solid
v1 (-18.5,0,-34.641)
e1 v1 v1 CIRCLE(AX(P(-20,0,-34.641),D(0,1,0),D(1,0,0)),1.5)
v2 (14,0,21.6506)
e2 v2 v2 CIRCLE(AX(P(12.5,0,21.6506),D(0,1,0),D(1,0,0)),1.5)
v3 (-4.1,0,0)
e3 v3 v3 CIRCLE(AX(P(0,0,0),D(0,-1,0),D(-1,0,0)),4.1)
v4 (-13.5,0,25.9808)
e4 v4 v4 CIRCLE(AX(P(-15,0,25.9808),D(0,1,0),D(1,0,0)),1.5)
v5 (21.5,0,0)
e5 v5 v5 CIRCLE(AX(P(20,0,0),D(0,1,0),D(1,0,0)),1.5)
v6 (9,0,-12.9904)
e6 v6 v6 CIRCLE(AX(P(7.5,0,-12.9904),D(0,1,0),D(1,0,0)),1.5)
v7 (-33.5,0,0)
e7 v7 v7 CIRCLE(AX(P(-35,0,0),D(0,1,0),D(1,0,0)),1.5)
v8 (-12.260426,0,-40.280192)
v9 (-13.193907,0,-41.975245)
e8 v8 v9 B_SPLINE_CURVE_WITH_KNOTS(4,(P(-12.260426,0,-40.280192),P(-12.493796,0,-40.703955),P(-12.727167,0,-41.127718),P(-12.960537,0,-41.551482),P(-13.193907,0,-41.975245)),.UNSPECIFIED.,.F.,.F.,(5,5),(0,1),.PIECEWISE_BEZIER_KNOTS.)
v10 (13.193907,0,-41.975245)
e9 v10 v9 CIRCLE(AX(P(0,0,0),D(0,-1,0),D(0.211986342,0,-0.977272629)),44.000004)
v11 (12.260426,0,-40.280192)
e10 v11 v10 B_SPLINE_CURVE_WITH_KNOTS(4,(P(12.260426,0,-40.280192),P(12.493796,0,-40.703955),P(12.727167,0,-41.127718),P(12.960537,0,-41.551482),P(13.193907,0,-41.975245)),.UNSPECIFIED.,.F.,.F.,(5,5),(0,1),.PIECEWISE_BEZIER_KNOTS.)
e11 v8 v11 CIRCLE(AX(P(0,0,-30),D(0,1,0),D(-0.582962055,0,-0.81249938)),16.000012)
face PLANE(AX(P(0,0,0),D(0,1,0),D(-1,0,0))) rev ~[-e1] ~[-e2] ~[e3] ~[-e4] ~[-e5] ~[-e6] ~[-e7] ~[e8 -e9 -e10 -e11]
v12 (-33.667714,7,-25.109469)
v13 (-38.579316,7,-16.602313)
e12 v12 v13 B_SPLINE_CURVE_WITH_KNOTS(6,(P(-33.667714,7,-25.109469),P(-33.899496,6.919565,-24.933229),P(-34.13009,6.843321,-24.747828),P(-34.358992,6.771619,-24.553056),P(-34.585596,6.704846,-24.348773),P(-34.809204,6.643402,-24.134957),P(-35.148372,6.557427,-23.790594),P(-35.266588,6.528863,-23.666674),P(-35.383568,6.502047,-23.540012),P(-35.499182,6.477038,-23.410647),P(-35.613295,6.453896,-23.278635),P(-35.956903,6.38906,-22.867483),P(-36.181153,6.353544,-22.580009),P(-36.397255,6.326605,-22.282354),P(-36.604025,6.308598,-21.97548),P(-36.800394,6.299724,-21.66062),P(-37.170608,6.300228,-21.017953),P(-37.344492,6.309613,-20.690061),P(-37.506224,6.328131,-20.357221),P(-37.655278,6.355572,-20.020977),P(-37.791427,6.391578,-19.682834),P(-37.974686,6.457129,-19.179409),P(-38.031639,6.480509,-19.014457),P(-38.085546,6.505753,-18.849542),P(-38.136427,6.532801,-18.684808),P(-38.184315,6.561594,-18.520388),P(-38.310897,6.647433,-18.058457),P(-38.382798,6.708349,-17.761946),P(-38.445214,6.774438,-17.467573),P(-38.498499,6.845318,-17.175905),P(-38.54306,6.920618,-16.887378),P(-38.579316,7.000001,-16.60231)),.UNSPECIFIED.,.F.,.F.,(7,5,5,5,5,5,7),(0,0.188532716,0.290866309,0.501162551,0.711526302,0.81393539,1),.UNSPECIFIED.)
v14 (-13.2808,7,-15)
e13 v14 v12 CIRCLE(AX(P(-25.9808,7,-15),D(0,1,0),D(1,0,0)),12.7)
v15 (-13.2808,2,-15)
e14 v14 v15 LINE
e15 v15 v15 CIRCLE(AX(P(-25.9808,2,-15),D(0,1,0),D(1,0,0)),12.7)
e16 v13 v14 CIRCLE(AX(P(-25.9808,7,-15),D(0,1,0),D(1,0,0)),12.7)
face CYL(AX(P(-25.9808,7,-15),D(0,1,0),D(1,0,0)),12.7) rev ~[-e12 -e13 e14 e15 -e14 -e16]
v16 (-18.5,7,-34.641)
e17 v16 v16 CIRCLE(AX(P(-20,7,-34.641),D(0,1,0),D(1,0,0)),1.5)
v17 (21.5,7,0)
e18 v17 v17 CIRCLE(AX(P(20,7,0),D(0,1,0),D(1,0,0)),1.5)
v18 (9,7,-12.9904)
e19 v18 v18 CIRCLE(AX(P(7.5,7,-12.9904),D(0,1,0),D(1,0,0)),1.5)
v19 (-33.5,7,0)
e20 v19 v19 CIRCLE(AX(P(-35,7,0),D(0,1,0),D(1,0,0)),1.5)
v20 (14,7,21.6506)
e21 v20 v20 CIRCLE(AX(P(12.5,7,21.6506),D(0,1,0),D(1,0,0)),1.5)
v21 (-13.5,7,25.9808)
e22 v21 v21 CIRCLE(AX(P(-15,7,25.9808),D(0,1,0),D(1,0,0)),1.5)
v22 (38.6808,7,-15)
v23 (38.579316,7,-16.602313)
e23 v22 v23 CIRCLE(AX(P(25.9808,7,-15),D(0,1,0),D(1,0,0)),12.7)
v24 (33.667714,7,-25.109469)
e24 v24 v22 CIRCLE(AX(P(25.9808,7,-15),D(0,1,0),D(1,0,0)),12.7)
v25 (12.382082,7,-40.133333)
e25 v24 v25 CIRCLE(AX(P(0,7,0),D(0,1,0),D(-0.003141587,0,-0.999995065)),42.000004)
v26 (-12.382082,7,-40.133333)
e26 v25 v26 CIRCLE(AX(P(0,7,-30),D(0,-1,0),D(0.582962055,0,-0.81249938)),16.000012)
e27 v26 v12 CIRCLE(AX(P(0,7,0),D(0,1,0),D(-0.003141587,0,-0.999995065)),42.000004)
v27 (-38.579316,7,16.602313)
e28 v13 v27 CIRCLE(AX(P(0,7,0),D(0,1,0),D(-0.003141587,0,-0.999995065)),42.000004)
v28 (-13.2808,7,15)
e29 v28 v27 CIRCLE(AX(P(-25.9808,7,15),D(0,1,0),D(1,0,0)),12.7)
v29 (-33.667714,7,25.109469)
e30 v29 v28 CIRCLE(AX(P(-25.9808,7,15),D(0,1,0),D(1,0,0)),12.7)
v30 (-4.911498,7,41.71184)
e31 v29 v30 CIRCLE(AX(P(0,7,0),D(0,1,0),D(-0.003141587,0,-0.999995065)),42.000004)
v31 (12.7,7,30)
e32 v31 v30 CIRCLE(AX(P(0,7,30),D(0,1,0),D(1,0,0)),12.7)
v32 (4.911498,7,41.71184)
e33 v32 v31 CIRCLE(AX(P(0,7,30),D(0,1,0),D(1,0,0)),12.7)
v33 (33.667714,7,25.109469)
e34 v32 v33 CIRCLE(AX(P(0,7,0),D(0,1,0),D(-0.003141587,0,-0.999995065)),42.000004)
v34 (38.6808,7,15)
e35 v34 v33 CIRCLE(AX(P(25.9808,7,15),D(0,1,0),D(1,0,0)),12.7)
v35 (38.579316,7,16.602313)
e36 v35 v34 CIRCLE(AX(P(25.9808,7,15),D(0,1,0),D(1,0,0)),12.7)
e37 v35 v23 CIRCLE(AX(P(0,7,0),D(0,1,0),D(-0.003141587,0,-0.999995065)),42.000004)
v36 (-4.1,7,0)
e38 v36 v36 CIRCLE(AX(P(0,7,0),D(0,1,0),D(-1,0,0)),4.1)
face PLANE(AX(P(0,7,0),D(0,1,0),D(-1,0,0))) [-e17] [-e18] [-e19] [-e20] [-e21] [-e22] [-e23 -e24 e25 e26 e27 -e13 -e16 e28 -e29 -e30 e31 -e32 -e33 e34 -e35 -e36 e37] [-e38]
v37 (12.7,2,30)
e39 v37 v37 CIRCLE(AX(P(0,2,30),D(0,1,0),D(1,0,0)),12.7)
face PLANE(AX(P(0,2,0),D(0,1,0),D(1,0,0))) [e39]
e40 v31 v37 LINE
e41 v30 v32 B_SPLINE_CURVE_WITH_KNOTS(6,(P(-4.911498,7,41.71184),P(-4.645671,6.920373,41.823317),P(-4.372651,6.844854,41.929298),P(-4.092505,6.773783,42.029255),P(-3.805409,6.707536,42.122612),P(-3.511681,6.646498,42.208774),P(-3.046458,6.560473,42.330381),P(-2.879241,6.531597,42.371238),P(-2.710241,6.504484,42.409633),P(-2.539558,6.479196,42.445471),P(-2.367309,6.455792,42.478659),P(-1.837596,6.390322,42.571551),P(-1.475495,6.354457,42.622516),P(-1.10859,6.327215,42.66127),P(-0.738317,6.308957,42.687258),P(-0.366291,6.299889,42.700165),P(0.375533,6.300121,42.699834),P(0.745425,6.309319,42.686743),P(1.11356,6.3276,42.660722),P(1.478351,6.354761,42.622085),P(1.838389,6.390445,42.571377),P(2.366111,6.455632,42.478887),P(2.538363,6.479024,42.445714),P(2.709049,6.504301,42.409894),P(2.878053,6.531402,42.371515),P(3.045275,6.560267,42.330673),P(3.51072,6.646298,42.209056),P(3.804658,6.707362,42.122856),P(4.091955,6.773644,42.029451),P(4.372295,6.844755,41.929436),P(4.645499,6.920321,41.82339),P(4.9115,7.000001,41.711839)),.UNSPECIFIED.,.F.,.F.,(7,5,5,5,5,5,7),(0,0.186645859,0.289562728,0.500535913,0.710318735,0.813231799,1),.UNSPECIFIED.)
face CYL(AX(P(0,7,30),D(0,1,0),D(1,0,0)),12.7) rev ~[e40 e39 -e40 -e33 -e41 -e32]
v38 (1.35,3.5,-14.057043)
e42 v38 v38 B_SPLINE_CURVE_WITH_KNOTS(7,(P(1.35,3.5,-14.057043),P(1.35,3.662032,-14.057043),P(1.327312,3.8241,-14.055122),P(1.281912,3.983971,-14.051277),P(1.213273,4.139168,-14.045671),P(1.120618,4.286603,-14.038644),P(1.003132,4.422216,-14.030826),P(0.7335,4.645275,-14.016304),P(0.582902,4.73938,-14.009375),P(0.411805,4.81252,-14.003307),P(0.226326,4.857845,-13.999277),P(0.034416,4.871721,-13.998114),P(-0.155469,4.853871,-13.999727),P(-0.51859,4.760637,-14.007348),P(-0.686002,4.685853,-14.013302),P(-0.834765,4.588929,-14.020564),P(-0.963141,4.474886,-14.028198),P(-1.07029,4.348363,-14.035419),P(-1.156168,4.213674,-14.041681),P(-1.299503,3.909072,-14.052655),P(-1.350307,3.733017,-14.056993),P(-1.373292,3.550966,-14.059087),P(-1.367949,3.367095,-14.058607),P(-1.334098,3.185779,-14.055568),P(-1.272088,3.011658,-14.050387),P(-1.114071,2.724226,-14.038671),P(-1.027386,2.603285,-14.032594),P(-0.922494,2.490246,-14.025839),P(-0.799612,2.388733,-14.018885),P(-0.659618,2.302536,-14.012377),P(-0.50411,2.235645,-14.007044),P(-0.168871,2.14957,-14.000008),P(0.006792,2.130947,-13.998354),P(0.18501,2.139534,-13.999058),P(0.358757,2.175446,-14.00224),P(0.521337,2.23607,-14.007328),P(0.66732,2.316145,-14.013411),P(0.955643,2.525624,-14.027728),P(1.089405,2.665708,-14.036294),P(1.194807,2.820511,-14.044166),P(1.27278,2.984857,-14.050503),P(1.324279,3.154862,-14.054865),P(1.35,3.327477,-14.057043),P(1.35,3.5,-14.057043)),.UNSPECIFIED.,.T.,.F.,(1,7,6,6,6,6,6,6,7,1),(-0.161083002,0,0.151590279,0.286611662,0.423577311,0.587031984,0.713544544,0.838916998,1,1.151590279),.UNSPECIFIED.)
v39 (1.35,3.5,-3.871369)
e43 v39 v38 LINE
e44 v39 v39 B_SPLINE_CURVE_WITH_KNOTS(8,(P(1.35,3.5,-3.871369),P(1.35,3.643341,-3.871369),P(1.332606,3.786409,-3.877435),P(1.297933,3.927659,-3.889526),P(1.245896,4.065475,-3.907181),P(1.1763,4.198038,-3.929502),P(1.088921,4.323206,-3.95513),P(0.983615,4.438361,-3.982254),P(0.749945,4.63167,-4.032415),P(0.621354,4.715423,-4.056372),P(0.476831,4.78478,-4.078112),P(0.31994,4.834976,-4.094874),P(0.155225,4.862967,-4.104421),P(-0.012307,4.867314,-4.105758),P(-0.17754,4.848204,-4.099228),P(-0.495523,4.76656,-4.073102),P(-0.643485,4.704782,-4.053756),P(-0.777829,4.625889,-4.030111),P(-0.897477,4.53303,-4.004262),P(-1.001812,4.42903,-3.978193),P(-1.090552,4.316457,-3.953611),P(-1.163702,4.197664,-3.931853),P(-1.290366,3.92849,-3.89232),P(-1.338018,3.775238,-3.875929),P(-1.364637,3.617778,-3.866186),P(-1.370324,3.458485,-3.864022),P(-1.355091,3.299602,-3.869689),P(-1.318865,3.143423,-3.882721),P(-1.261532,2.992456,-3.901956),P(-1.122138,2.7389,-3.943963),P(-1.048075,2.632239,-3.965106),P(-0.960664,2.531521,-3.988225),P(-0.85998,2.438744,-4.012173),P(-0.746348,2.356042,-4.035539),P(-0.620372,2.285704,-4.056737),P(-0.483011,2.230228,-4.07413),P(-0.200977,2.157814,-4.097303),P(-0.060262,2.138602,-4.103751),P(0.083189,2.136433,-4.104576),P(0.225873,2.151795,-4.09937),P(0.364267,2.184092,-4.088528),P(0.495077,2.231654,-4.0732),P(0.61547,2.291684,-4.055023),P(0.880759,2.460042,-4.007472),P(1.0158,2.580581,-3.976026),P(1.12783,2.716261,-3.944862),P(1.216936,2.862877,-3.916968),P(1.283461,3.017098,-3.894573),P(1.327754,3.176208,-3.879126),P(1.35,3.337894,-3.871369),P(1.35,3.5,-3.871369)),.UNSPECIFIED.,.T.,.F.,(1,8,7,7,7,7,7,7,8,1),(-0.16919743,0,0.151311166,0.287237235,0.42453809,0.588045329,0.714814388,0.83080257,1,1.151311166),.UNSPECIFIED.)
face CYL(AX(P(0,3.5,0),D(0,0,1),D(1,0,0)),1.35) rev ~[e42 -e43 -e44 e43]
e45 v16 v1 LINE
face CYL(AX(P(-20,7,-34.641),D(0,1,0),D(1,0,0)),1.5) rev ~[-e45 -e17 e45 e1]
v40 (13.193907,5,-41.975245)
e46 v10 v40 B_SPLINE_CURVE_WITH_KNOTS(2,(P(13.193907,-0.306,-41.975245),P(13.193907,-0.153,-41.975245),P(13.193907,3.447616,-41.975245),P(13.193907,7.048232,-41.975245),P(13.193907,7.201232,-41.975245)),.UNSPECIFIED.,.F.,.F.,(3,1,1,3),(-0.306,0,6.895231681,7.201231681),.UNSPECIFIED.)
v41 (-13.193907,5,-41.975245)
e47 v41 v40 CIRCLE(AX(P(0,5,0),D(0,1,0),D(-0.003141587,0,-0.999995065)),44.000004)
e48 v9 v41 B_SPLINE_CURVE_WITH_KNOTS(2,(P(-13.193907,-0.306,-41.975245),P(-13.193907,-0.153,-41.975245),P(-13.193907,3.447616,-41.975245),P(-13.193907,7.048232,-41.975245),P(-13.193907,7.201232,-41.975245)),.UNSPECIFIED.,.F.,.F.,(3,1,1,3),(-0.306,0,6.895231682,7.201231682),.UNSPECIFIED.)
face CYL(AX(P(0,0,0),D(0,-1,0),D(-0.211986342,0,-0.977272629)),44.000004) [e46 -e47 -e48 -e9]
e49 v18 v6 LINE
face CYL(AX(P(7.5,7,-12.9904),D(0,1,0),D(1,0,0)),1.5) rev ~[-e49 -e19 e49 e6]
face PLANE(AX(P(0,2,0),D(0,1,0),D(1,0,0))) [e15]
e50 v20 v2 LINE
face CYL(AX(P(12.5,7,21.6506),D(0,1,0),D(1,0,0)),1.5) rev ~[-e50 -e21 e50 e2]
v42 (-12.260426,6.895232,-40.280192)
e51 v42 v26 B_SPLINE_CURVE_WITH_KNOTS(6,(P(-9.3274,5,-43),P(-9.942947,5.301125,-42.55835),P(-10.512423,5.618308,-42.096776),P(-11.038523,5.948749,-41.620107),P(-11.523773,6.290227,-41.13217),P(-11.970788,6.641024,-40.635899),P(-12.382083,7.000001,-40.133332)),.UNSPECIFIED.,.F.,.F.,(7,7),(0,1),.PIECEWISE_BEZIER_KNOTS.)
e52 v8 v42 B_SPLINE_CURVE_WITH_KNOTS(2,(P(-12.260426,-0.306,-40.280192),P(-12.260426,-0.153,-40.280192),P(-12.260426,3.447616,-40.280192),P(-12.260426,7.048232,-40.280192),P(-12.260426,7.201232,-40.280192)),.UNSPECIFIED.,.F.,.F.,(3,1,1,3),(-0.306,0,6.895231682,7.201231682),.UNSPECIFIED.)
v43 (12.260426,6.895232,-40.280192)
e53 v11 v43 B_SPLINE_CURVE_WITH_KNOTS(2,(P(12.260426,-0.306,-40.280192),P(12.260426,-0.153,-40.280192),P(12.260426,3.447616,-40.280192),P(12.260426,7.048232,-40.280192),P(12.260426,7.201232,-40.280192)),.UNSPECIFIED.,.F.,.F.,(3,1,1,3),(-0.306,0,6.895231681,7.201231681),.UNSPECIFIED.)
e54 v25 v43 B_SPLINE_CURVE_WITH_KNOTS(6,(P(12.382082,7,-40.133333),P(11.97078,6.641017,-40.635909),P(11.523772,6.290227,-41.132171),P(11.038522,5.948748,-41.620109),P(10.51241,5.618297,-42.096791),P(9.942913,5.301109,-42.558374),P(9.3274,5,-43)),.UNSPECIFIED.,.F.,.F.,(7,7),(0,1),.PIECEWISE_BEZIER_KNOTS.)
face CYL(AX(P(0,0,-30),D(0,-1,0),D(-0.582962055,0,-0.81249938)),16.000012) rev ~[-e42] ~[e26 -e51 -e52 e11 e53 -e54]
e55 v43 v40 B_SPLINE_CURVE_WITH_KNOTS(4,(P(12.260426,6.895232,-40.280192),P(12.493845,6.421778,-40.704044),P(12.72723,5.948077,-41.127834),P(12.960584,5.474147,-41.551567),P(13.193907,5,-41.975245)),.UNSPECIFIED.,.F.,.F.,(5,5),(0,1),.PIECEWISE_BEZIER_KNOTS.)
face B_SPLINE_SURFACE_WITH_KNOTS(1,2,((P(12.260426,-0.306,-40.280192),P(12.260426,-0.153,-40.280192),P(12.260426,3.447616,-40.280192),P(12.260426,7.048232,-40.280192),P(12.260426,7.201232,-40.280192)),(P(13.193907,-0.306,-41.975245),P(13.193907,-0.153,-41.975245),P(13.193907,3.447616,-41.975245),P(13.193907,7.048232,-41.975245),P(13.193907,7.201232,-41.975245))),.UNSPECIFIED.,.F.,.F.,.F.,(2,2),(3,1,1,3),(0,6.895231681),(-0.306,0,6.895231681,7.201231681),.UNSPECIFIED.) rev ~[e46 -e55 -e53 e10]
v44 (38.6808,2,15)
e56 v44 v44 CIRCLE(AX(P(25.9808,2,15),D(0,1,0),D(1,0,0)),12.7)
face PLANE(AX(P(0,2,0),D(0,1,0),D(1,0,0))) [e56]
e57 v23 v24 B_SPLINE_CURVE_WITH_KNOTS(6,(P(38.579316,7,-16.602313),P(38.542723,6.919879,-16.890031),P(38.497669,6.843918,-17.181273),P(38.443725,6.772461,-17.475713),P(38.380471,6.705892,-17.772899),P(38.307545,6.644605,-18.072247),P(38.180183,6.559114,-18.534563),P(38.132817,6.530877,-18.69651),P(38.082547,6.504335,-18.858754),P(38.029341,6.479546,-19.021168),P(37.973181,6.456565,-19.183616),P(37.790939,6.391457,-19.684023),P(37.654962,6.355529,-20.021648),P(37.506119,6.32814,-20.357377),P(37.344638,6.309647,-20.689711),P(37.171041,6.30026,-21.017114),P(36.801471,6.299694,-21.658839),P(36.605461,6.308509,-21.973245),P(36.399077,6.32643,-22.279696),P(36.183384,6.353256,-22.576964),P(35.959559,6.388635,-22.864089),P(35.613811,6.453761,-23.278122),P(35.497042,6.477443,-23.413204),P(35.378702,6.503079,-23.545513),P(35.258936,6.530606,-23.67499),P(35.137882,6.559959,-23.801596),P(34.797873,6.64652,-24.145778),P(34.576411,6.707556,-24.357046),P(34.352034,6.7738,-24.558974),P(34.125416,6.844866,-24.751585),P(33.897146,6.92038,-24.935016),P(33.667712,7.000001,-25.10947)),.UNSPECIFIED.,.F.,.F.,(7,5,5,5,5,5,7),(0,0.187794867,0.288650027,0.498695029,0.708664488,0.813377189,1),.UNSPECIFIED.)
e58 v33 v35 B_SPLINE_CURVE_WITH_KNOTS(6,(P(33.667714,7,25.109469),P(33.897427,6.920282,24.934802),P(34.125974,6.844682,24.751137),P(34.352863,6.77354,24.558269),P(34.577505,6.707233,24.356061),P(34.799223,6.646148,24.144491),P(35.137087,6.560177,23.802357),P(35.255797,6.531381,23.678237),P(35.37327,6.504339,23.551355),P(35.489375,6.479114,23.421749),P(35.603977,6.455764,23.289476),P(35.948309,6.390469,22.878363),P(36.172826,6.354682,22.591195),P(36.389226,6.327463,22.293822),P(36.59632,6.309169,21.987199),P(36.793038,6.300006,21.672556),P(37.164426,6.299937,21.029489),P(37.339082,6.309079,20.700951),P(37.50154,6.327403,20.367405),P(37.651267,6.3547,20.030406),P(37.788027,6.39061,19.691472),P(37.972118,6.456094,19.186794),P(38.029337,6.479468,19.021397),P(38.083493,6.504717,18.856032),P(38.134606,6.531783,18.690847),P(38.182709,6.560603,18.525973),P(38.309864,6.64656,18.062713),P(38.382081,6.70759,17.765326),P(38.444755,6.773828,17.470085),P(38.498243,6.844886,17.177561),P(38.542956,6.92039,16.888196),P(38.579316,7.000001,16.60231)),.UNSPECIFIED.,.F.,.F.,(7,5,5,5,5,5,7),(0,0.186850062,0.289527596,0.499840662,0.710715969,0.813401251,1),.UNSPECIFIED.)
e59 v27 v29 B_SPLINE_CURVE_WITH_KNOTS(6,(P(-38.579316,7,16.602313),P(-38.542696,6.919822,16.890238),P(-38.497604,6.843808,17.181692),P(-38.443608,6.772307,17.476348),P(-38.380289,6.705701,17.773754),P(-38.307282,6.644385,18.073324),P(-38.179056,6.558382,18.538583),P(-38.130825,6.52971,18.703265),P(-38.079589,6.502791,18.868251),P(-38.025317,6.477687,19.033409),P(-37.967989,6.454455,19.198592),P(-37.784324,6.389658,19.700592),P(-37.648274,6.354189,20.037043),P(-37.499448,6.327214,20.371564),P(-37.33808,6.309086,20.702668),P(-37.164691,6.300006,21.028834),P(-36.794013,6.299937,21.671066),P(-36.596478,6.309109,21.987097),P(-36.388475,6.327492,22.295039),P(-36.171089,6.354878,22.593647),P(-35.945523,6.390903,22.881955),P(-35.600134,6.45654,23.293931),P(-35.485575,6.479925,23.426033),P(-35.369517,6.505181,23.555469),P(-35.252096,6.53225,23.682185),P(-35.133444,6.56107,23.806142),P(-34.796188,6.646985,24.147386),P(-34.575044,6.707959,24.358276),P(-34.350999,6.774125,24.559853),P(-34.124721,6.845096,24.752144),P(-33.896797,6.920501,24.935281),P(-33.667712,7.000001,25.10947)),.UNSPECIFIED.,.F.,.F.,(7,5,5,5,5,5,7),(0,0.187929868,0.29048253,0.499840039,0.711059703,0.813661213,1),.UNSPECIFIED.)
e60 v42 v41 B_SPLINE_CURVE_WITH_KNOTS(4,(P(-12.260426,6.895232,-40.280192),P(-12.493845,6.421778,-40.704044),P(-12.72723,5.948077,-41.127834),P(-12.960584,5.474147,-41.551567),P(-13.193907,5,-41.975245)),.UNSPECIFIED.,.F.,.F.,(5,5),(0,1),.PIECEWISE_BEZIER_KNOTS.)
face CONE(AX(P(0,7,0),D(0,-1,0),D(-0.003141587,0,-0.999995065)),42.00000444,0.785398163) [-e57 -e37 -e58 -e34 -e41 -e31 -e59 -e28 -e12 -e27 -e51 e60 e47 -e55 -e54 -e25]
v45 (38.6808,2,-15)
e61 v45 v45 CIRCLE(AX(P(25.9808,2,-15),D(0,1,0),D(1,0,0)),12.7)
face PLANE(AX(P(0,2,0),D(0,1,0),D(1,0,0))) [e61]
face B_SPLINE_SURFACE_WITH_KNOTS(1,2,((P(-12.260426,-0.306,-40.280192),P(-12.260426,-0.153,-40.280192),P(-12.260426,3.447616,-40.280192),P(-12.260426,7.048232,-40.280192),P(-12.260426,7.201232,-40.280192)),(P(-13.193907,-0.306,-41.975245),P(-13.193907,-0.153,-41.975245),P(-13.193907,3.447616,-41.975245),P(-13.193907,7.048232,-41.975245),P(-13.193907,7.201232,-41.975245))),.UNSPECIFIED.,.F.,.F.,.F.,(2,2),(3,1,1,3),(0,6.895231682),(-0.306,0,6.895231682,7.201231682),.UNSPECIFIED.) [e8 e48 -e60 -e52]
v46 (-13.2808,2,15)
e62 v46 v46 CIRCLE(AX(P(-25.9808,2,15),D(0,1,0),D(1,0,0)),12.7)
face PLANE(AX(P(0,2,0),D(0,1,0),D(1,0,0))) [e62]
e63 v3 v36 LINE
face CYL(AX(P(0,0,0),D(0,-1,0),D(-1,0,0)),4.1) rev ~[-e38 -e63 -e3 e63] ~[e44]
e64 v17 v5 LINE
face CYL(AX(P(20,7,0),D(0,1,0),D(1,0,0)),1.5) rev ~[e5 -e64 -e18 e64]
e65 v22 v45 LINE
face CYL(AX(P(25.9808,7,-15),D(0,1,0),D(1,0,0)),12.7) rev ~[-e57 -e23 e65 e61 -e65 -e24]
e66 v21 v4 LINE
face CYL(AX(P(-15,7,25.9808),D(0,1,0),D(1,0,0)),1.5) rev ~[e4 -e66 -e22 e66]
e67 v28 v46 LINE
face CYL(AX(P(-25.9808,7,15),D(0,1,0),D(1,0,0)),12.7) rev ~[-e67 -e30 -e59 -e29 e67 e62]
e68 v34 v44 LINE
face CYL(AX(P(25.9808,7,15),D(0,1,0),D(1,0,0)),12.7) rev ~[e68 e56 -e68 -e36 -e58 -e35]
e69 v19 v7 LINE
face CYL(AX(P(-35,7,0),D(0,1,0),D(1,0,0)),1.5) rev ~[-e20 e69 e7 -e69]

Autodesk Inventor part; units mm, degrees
ref_plane "YZ Plane" through (0, 0, 0) normal (1, 0, 0) x (0, 1, 0)
ref_plane "XZ Plane" through (0, 0, 0) normal (0, 1, 0) x (-1, 0, 0)
ref_plane "XY Plane" through (0, 0, 0) normal (0, 0, 1) x (1, 0, 0)
sketch "Sketch1" plane through (0, 0, 0) normal (0, 1, 0) x (-1, 0, 0)
  circle A0 centre (0, 0) radius 44 construction
  circle A1 centre (0, 0) radius 4.1
  line L0 (0, -30) -> (-25.9808, -15) construction
  line L1 (-25.9808, -15) -> (-25.9808, 15) construction
  line L2 (-25.9808, 15) -> (0, 30) construction
  line L3 (0, 30) -> (25.9808, 15) construction
  line L4 (25.9808, 15) -> (25.9808, -15) construction
  line L5 (25.9808, -15) -> (0, -30) construction
  circle A2 centre (0, -30) radius 12.7 construction
  circle A3 centre (0, -30) radius 16 construction
  circle A4 centre (25.9808, -15) radius 12.7 construction
  arc A5 (9.3274, -43) -> (-9.3274, -43) centre (0, -30) ccw construction
  arc A6 (9.3274, -43) -> (-9.3274, -43) centre (0, 0) ccw
  line L6 (0, -64) -> (0, 62) projected
  arc A7 (9.3274, -43) -> (-9.3274, -43) centre (0, -30) ccw
  dimension "d0" = 88
  dimension "d4" = 32
  dimension "d1" = 8.2
  dimension "d2" = 25.4
  dimension "d3" = 30
  dimension "d5" = 25.4
extrude "Extrusion1" add sketch "Sketch1" along normal blind 7 contours A1 L6 A6 A7 | A1 L6 A7 A6
sketch "Sketch2" plane through (0, 7, 0) normal (0, 1, 0) x (1, 0, 0)
  arc A0 (-9.3274, 43) -> (9.3274, 43) centre (0, 30) ccw construction
  line L0 (0, 30) -> (25.9808, 15) construction
  line L1 (25.9808, 15) -> (25.9808, -15) construction
  line L2 (25.9808, -15) -> (0, -30) construction
  line L3 (0, -30) -> (-25.9808, -15) construction
  line L4 (-25.9808, -15) -> (-25.9808, 15) construction
  line L5 (-25.9808, 15) -> (0, 30) construction
  circle A1 centre (-25.9808, 15) radius 12.7
  circle A2 centre (-25.9808, -15) radius 12.7
  circle A3 centre (0, -30) radius 12.7
  circle A4 centre (25.9808, -15) radius 12.7
  circle A5 centre (25.9808, 15) radius 12.7
  point P0 (0, 0)
  point P1 (0, 0)
  dimension "d8" = 25.4
extrude "Extrusion2" cut sketch "Sketch2" against normal blind 5
chamfer "Chamfer1" distance 2 angle 45 1 edges at (0, 7, 44)
chamfer "Chamfer2" distance 4 angle 45 2 edges at (-9.3274, 2.5, -43) (9.3274, 2.5, -43)
sketch "Sketch3" plane through (0, 0, 0) normal (0, 0, 1) x (1, 0, 0)
  circle A0 centre (0, 3.5) radius 1.35
  line L0 (-16, 0) -> (16, 0) projected
  point P0 (0, 0)
  point P1 (12.2604, 0)
  point P2 (-12.2604, 0)
  dimension "d17" = 3.5
  dimension "d18" = 2.7
extrude "Extrusion3" cut sketch "Sketch3" against normal through all
sketch "Sketch4" plane through (0, 7, 0) normal (0, 1, 0) x (1, 0, 0)
  circle A0 centre (-25.9808, 15) radius 12.7 construction
  arc A1 (-33.6678, -25.1094) -> (-38.5793, -16.6024) centre (-25.9808, -15) ccw construction
  arc A2 (4.9115, -41.7118) -> (-4.9115, -41.7118) centre (0, -30) ccw construction
  arc A3 (38.5793, -16.6024) -> (33.6678, -25.1094) centre (25.9808, -15) ccw construction
  arc A4 (33.6678, 25.1094) -> (38.5793, 16.6024) centre (25.9808, 15) ccw construction
  circle A5 centre (0, 0) radius 4.1 construction
  line L0 (0, 0) -> (0, -30) construction
  circle A6 centre (0, 0) radius 40 construction
  circle A7 centre (0, 0) radius 35 construction
  circle A8 centre (0, 0) radius 30 construction
  circle A9 centre (0, 0) radius 25 construction
  circle A10 centre (0, 0) radius 20 construction
  circle A11 centre (0, 0) radius 15 construction
  line L1 (61.6, 0) -> (-61.6, 0) construction
  circle A12 centre (7.5, 12.9904) radius 1.5
  circle A13 centre (-20, 34.641) radius 1.5
  circle A14 centre (-35, 0) radius 1.5
  circle A15 centre (-15, -25.9808) radius 1.5
  circle A16 centre (12.5, -21.6506) radius 1.5
  circle A17 centre (20, 0) radius 1.5
  line L2 (0, 59.1703) -> (0, -61.195) construction
  dimension "d28" = 80
  dimension "d29" = 70
  dimension "d30" = 60
  dimension "d31" = 50
  dimension "d32" = 40
  dimension "d38" = 30
  dimension "d45" = 3
  dimension "d46" = 60
  dimension "d47" = 60
  dimension "d48" = 60
  dimension "d49" = 60
extrude "Extrusion4" cut sketch "Sketch4" against normal through all
properties part number "carousel_print"
